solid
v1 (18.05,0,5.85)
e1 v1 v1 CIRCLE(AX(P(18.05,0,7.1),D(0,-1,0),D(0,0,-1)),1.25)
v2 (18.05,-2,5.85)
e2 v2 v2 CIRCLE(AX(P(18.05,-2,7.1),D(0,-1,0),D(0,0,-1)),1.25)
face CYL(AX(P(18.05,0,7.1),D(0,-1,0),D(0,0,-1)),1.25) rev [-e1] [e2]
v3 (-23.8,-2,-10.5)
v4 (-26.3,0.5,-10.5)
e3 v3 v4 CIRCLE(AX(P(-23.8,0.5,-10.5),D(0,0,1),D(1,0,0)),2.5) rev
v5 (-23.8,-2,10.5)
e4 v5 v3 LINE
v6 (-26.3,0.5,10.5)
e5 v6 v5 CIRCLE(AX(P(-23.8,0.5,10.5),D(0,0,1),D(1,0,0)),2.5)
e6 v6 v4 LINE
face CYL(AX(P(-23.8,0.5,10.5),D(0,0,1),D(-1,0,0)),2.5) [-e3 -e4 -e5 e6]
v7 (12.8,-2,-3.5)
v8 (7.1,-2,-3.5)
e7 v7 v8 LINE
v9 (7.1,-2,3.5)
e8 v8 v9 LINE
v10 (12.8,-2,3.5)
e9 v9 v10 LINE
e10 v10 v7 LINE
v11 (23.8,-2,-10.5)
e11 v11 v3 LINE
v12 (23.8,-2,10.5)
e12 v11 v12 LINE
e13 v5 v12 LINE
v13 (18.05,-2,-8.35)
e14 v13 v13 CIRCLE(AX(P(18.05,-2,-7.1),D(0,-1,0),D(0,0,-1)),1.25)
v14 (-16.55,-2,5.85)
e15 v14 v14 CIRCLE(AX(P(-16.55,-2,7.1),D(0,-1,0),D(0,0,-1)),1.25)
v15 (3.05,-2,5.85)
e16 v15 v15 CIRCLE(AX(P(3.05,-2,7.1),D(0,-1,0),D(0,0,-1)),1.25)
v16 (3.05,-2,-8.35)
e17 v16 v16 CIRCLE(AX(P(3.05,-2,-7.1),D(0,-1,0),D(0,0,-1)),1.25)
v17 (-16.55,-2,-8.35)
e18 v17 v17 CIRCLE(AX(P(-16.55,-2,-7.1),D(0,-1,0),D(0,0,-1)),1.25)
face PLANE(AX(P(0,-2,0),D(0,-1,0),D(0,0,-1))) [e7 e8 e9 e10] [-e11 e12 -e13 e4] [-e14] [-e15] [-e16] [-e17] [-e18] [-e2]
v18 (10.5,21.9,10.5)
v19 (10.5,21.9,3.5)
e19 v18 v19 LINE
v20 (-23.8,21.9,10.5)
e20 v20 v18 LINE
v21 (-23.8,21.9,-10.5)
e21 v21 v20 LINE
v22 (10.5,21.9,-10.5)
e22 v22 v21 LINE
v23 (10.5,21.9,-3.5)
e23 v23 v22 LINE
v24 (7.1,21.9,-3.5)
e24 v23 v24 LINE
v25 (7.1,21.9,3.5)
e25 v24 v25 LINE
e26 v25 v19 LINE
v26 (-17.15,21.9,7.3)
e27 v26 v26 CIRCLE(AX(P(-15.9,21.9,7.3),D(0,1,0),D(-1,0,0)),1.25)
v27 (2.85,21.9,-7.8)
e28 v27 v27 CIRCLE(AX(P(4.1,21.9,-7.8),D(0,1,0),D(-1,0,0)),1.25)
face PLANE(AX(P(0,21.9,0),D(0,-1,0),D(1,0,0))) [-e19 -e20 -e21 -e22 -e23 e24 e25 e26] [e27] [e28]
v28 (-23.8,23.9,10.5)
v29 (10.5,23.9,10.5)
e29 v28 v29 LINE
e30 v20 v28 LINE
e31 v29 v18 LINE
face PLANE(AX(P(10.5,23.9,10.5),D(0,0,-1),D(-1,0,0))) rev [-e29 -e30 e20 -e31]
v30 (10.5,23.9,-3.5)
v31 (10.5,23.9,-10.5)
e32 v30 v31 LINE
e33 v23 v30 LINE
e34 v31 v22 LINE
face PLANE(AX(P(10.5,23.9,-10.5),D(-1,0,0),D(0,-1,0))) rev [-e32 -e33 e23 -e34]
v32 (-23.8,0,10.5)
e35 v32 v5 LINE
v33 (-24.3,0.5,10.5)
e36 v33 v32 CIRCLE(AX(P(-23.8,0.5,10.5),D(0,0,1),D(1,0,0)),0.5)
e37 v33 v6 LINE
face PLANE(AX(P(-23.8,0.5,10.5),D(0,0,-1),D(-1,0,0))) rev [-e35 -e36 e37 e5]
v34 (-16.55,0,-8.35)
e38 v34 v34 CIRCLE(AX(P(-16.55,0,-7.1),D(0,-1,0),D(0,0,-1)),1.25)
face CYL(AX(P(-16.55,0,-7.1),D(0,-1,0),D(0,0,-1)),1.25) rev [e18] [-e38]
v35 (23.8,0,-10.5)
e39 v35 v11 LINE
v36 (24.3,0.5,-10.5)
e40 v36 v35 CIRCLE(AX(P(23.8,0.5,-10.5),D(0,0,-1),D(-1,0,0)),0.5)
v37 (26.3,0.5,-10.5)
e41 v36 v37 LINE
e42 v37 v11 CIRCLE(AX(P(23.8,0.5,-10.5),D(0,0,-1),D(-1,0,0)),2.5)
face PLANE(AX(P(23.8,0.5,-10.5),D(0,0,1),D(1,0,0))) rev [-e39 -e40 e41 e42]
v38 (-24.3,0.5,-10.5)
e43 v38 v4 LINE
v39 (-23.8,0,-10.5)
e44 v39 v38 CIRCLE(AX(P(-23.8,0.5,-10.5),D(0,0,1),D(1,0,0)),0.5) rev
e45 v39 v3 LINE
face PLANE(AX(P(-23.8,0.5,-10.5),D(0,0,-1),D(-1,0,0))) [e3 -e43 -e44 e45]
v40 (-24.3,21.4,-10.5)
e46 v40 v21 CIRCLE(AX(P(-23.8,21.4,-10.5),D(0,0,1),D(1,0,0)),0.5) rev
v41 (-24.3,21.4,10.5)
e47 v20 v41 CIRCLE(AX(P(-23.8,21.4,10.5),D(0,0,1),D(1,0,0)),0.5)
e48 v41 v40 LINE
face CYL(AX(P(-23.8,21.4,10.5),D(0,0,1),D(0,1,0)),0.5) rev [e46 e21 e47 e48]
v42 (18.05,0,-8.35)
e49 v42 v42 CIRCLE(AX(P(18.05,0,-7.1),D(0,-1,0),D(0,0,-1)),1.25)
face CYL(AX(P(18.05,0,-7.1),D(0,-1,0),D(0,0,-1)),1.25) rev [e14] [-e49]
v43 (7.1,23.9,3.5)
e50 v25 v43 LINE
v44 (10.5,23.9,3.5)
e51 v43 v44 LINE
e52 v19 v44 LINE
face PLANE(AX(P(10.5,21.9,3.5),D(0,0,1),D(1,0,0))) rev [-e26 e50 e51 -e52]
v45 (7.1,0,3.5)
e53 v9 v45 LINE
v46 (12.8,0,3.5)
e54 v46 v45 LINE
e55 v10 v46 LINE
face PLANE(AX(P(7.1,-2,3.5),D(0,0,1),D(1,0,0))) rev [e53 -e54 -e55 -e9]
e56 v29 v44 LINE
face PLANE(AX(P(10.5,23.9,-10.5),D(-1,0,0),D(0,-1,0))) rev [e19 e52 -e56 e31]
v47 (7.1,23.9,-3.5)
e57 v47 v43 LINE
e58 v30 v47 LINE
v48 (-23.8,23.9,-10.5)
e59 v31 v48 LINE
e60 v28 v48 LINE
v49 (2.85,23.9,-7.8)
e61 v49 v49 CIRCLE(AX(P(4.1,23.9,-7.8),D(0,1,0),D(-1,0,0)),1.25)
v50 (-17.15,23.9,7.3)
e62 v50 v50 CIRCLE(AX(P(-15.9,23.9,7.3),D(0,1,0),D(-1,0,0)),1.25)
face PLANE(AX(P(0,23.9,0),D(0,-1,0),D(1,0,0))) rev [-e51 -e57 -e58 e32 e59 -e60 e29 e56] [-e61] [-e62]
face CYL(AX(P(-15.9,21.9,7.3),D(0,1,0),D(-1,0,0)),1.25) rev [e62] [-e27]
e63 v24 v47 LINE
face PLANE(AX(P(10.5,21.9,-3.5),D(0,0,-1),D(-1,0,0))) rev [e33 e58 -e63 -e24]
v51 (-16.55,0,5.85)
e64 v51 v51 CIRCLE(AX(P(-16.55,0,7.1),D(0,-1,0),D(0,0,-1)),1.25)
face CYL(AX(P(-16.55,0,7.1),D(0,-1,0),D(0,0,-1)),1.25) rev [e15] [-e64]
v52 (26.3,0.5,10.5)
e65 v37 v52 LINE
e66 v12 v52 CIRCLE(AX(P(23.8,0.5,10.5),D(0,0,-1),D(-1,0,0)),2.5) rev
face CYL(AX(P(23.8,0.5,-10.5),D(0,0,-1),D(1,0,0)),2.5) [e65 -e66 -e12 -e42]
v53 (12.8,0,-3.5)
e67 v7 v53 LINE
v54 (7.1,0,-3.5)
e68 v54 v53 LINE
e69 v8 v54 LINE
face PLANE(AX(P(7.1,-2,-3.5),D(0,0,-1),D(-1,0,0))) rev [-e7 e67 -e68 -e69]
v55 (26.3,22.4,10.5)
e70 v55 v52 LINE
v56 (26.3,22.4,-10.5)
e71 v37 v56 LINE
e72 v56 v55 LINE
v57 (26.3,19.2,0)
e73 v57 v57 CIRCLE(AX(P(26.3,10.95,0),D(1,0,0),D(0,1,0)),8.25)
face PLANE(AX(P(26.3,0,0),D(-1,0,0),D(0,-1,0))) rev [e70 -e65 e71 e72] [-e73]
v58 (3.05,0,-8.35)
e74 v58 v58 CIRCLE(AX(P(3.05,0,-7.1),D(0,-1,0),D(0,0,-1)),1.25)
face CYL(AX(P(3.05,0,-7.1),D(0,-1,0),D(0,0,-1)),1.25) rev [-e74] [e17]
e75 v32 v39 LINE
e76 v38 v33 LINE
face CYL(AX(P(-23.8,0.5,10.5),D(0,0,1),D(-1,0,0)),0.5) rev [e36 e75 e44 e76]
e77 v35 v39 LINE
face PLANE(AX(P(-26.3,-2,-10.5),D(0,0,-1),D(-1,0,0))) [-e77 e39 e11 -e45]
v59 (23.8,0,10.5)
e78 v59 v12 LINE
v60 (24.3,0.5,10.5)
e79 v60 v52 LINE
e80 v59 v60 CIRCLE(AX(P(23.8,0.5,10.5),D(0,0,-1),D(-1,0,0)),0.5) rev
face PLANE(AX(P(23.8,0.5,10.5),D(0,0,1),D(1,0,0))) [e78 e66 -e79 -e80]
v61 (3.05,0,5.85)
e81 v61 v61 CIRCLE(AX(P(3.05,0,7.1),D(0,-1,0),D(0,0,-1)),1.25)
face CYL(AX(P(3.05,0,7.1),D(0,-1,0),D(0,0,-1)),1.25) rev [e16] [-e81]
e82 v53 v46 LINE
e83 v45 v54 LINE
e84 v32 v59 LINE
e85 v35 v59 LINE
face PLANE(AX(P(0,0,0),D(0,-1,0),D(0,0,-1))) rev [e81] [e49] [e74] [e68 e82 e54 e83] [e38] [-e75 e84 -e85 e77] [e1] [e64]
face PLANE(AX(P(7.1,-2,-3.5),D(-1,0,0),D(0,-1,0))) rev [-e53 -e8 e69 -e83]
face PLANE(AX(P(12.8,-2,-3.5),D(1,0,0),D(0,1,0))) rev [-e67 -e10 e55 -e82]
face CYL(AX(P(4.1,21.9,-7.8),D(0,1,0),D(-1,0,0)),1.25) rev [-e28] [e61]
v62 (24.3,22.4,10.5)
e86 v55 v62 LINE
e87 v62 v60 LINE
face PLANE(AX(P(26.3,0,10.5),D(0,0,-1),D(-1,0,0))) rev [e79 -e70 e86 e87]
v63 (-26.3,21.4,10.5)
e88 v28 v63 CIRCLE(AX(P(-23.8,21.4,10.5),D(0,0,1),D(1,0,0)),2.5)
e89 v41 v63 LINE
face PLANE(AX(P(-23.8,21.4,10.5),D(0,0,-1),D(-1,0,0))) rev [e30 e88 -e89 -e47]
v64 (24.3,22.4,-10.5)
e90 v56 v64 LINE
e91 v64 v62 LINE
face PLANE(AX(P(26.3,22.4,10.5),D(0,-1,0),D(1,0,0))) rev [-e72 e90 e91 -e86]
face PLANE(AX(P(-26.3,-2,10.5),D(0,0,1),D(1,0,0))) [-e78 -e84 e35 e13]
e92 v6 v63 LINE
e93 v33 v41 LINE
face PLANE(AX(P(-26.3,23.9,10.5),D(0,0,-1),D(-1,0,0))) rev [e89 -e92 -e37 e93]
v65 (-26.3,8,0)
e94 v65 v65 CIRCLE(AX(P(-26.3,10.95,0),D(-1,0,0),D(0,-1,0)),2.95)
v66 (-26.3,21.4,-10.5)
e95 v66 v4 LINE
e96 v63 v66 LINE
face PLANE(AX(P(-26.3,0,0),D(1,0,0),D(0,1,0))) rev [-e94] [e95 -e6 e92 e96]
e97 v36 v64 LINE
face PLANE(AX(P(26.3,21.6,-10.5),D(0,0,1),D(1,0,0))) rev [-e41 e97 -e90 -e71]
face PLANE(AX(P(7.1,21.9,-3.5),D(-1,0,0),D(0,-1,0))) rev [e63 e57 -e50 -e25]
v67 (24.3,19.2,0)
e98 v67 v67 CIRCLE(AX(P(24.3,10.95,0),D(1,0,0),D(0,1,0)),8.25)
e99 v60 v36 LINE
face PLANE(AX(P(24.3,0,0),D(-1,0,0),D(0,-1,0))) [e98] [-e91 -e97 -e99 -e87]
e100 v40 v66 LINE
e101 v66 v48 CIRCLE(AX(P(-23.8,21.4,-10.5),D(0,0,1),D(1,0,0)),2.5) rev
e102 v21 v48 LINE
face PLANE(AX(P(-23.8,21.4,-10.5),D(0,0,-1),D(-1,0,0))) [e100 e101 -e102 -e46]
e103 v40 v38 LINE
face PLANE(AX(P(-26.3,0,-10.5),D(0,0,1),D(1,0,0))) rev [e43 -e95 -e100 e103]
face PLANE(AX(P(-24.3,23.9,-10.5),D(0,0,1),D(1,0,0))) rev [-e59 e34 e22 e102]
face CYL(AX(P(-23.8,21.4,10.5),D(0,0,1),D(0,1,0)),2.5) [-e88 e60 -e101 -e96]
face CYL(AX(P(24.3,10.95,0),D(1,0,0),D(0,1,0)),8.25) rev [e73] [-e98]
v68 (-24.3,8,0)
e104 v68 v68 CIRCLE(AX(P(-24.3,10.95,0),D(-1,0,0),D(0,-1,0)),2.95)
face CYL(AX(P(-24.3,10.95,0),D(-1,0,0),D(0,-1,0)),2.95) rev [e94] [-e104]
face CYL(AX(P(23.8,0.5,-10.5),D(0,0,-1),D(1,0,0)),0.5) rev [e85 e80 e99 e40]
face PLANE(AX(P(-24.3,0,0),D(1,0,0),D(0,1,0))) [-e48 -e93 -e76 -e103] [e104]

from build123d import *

# Parameters (mm, degrees)
SKETCH1_W                    = 52.6
SKETCH1_H                    = 21
BASE_FLANGE1_DEPTH           = 2
EDGE_FLANGE1_STRIP_W         = 9
EDGE_FLANGE1_STRIP_H         = 2
EDGE_FLANGE1_STRIP_CUT_DEPTH = 21
EDGE_FLANGE1_DEPTH           = 21
EDGE_FLANGE2_STRIP_W         = 9
EDGE_FLANGE2_STRIP_H         = 2
EDGE_FLANGE2_STRIP_CUT_DEPTH = 21
EDGE_FLANGE2_DEPTH           = 21
EDGE_FLANGE3_STRIP_W         = 9
EDGE_FLANGE3_STRIP_H         = 2
EDGE_FLANGE3_STRIP_CUT_DEPTH = 21
EDGE_FLANGE3_DEPTH           = 21
SKETCH15_W                   = 3.4
SKETCH15_H                   = 7
CUT_EXTRUDE1_DEPTH           = 10
SKETCH16_R                   = 1.25
CUT_EXTRUDE2_DEPTH           = 2
SKETCH18_W                   = 5.7
SKETCH18_H                   = 7
CUT_EXTRUDE3_DEPTH           = 39.376425055
SKETCH19_R                   = 2.95
CUT_EXTRUDE4_DEPTH           = 2
SKETCH20_R                   = 1.25
CUT_EXTRUDE5_DEPTH           = 2
SKETCH21_R                   = 8.25
CUT_EXTRUDE6_DEPTH           = 2
MOVE_FACE1_BY                = 0.8


# Sheet-metal steps are written as plain solids
with BuildPart() as part:
    # Sketch1 → Base-Flange1 (new body)
    with BuildSketch(Plane(origin=(0, 0, 0), x_dir=(1, 0, 0), z_dir=(0, 1, 0))):
        Rectangle(SKETCH1_W, SKETCH1_H)
    extrude(amount=-BASE_FLANGE1_DEPTH)

    # Edge-Flange1 strip (across the edge) → Edge-Flange1 strip cut (cut)
    with BuildSketch(Plane(origin=(-26.3, 0, -10.5), x_dir=(1, 0, 0), z_dir=(0, 0, 1))):
        with Locations((-2, -1)):
            Rectangle(EDGE_FLANGE1_STRIP_W, EDGE_FLANGE1_STRIP_H)
    extrude(amount=EDGE_FLANGE1_STRIP_CUT_DEPTH, mode=Mode.SUBTRACT)

    # Edge-Flange1 section (across the edge) → Edge-Flange1 (add)
    with BuildSketch(Plane(origin=(-26.3, 0, -10.5), x_dir=(1, 0, 0), z_dir=(0, 0, 1))):
        with BuildLine():
            Line((0, 0.5), (0, 23.9))
            Line((0, 23.9), (2, 23.9))
            Line((2, 23.9), (2, 0.5))
            ThreePointArc((2, 0.5), (2.146446609, 0.146446609), (2.5, 0))
            Line((2.5, 0), (2.5, -2))
            ThreePointArc((2.5, -2), (0.732233047, -1.267766953), (0, 0.5))
        make_face()
    extrude(amount=EDGE_FLANGE1_DEPTH)

    # Edge-Flange2 strip (across the edge) → Edge-Flange2 strip cut (cut)
    with BuildSketch(Plane(origin=(-24.3, 23.9, -10.5), x_dir=(0, -1, 0), z_dir=(0, 0, 1))):
        with Locations((-2, -1)):
            Rectangle(EDGE_FLANGE2_STRIP_W, EDGE_FLANGE2_STRIP_H)
    extrude(amount=EDGE_FLANGE2_STRIP_CUT_DEPTH, mode=Mode.SUBTRACT)

    # Edge-Flange2 section (across the edge) → Edge-Flange2 (add)
    with BuildSketch(Plane(origin=(-24.3, 23.9, -10.5), x_dir=(0, -1, 0), z_dir=(0, 0, 1))):
        with BuildLine():
            Line((0, 0.5), (0, 34.8))
            Line((0, 34.8), (2, 34.8))
            Line((2, 34.8), (2, 0.5))
            ThreePointArc((2, 0.5), (2.146446609, 0.146446609), (2.5, 0))
            Line((2.5, 0), (2.5, -2))
            ThreePointArc((2.5, -2), (0.732233047, -1.267766953), (0, 0.5))
        make_face()
    extrude(amount=EDGE_FLANGE2_DEPTH)

    # Edge-Flange3 strip (across the edge) → Edge-Flange3 strip cut (cut)
    with BuildSketch(Plane(origin=(26.3, 0, 10.5), x_dir=(-1, 0, 0), z_dir=(0, 0, -1))):
        with Locations((-2, -1)):
            Rectangle(EDGE_FLANGE3_STRIP_W, EDGE_FLANGE3_STRIP_H)
    extrude(amount=EDGE_FLANGE3_STRIP_CUT_DEPTH, mode=Mode.SUBTRACT)

    # Edge-Flange3 section (across the edge) → Edge-Flange3 (add)
    with BuildSketch(Plane(origin=(26.3, 0, 10.5), x_dir=(-1, 0, 0), z_dir=(0, 0, -1))):
        with BuildLine():
            Line((0, 0.5), (0, 21.6))
            Line((0, 21.6), (2, 21.6))
            Line((2, 21.6), (2, 0.5))
            ThreePointArc((2, 0.5), (2.146446609, 0.146446609), (2.5, 0))
            Line((2.5, 0), (2.5, -2))
            ThreePointArc((2.5, -2), (0.732233047, -1.267766953), (0, 0.5))
        make_face()
    extrude(amount=EDGE_FLANGE3_DEPTH)

    # Sketch15 → Cut-Extrude1 (cut)
    with BuildSketch(Plane(origin=(0, 23.9, 0), x_dir=(1, 0, 0), z_dir=(0, 1, 0))):
        with Locations((8.8, 0)):
            Rectangle(SKETCH15_W, SKETCH15_H)
    extrude(amount=-CUT_EXTRUDE1_DEPTH, mode=Mode.SUBTRACT)

    # Sketch16 → Cut-Extrude2 (cut)
    with BuildSketch(Plane(origin=(0, 23.9, 0), x_dir=(1, 0, 0), z_dir=(0, 1, 0))):
        with Locations(Location((4.1, 7.8, 0), (0, 0, 180))):
            Circle(SKETCH16_R)
        with Locations(Location((-15.9, -7.3, 0), (0, 0, 180))):
            Circle(SKETCH16_R)
    extrude(amount=-CUT_EXTRUDE2_DEPTH, mode=Mode.SUBTRACT)

    # Sketch18 → Cut-Extrude3 (cut, through all)
    with BuildSketch(Plane(origin=(0, 23.9, 0), x_dir=(1, 0, 0), z_dir=(0, 1, 0))):
        with Locations((9.95, 0)):
            Rectangle(SKETCH18_W, SKETCH18_H)
    extrude(amount=-CUT_EXTRUDE3_DEPTH, mode=Mode.SUBTRACT)

    # Sketch19 → Cut-Extrude4 (cut)
    with BuildSketch(Plane.ZY.offset(26.3)):
        with Locations(Location((0, 10.95, 0), (0, 0, 270))):
            Circle(SKETCH19_R)
    extrude(amount=-CUT_EXTRUDE4_DEPTH, mode=Mode.SUBTRACT)

    # Sketch20 → Cut-Extrude5 (cut)
    with BuildSketch(Plane.XZ.offset(2)):
        with Locations(Location((-16.55, 7.1, 0), (0, 0, 270))):
            Circle(SKETCH20_R)
        with Locations(Location((3.05, 7.1, 0), (0, 0, 270))):
            Circle(SKETCH20_R)
        with Locations(Location((18.05, 7.1, 0), (0, 0, 270))):
            Circle(SKETCH20_R)
        with Locations(Location((-16.55, -7.1, 0), (0, 0, 270))):
            Circle(SKETCH20_R)
        with Locations(Location((3.05, -7.1, 0), (0, 0, 270))):
            Circle(SKETCH20_R)
        with Locations(Location((18.05, -7.1, 0), (0, 0, 270))):
            Circle(SKETCH20_R)
    extrude(amount=-CUT_EXTRUDE5_DEPTH, mode=Mode.SUBTRACT)

    # Sketch21 → Cut-Extrude6 (cut)
    with BuildSketch(Plane(origin=(26.3, 0, 0), x_dir=(0, 0, -1), z_dir=(1, 0, 0))):
        with Locations(Location((0, 10.95, 0), (0, 0, 90))):
            Circle(SKETCH21_R)
    extrude(amount=-CUT_EXTRUDE6_DEPTH, mode=Mode.SUBTRACT)

    # Move Face1: a face moved outward by 0.8
    extrude(part.faces().sort_by_distance((25.3, 21.6, 0))[0], amount=MOVE_FACE1_BY, dir=(0, 1, 0))


solid = part.part
